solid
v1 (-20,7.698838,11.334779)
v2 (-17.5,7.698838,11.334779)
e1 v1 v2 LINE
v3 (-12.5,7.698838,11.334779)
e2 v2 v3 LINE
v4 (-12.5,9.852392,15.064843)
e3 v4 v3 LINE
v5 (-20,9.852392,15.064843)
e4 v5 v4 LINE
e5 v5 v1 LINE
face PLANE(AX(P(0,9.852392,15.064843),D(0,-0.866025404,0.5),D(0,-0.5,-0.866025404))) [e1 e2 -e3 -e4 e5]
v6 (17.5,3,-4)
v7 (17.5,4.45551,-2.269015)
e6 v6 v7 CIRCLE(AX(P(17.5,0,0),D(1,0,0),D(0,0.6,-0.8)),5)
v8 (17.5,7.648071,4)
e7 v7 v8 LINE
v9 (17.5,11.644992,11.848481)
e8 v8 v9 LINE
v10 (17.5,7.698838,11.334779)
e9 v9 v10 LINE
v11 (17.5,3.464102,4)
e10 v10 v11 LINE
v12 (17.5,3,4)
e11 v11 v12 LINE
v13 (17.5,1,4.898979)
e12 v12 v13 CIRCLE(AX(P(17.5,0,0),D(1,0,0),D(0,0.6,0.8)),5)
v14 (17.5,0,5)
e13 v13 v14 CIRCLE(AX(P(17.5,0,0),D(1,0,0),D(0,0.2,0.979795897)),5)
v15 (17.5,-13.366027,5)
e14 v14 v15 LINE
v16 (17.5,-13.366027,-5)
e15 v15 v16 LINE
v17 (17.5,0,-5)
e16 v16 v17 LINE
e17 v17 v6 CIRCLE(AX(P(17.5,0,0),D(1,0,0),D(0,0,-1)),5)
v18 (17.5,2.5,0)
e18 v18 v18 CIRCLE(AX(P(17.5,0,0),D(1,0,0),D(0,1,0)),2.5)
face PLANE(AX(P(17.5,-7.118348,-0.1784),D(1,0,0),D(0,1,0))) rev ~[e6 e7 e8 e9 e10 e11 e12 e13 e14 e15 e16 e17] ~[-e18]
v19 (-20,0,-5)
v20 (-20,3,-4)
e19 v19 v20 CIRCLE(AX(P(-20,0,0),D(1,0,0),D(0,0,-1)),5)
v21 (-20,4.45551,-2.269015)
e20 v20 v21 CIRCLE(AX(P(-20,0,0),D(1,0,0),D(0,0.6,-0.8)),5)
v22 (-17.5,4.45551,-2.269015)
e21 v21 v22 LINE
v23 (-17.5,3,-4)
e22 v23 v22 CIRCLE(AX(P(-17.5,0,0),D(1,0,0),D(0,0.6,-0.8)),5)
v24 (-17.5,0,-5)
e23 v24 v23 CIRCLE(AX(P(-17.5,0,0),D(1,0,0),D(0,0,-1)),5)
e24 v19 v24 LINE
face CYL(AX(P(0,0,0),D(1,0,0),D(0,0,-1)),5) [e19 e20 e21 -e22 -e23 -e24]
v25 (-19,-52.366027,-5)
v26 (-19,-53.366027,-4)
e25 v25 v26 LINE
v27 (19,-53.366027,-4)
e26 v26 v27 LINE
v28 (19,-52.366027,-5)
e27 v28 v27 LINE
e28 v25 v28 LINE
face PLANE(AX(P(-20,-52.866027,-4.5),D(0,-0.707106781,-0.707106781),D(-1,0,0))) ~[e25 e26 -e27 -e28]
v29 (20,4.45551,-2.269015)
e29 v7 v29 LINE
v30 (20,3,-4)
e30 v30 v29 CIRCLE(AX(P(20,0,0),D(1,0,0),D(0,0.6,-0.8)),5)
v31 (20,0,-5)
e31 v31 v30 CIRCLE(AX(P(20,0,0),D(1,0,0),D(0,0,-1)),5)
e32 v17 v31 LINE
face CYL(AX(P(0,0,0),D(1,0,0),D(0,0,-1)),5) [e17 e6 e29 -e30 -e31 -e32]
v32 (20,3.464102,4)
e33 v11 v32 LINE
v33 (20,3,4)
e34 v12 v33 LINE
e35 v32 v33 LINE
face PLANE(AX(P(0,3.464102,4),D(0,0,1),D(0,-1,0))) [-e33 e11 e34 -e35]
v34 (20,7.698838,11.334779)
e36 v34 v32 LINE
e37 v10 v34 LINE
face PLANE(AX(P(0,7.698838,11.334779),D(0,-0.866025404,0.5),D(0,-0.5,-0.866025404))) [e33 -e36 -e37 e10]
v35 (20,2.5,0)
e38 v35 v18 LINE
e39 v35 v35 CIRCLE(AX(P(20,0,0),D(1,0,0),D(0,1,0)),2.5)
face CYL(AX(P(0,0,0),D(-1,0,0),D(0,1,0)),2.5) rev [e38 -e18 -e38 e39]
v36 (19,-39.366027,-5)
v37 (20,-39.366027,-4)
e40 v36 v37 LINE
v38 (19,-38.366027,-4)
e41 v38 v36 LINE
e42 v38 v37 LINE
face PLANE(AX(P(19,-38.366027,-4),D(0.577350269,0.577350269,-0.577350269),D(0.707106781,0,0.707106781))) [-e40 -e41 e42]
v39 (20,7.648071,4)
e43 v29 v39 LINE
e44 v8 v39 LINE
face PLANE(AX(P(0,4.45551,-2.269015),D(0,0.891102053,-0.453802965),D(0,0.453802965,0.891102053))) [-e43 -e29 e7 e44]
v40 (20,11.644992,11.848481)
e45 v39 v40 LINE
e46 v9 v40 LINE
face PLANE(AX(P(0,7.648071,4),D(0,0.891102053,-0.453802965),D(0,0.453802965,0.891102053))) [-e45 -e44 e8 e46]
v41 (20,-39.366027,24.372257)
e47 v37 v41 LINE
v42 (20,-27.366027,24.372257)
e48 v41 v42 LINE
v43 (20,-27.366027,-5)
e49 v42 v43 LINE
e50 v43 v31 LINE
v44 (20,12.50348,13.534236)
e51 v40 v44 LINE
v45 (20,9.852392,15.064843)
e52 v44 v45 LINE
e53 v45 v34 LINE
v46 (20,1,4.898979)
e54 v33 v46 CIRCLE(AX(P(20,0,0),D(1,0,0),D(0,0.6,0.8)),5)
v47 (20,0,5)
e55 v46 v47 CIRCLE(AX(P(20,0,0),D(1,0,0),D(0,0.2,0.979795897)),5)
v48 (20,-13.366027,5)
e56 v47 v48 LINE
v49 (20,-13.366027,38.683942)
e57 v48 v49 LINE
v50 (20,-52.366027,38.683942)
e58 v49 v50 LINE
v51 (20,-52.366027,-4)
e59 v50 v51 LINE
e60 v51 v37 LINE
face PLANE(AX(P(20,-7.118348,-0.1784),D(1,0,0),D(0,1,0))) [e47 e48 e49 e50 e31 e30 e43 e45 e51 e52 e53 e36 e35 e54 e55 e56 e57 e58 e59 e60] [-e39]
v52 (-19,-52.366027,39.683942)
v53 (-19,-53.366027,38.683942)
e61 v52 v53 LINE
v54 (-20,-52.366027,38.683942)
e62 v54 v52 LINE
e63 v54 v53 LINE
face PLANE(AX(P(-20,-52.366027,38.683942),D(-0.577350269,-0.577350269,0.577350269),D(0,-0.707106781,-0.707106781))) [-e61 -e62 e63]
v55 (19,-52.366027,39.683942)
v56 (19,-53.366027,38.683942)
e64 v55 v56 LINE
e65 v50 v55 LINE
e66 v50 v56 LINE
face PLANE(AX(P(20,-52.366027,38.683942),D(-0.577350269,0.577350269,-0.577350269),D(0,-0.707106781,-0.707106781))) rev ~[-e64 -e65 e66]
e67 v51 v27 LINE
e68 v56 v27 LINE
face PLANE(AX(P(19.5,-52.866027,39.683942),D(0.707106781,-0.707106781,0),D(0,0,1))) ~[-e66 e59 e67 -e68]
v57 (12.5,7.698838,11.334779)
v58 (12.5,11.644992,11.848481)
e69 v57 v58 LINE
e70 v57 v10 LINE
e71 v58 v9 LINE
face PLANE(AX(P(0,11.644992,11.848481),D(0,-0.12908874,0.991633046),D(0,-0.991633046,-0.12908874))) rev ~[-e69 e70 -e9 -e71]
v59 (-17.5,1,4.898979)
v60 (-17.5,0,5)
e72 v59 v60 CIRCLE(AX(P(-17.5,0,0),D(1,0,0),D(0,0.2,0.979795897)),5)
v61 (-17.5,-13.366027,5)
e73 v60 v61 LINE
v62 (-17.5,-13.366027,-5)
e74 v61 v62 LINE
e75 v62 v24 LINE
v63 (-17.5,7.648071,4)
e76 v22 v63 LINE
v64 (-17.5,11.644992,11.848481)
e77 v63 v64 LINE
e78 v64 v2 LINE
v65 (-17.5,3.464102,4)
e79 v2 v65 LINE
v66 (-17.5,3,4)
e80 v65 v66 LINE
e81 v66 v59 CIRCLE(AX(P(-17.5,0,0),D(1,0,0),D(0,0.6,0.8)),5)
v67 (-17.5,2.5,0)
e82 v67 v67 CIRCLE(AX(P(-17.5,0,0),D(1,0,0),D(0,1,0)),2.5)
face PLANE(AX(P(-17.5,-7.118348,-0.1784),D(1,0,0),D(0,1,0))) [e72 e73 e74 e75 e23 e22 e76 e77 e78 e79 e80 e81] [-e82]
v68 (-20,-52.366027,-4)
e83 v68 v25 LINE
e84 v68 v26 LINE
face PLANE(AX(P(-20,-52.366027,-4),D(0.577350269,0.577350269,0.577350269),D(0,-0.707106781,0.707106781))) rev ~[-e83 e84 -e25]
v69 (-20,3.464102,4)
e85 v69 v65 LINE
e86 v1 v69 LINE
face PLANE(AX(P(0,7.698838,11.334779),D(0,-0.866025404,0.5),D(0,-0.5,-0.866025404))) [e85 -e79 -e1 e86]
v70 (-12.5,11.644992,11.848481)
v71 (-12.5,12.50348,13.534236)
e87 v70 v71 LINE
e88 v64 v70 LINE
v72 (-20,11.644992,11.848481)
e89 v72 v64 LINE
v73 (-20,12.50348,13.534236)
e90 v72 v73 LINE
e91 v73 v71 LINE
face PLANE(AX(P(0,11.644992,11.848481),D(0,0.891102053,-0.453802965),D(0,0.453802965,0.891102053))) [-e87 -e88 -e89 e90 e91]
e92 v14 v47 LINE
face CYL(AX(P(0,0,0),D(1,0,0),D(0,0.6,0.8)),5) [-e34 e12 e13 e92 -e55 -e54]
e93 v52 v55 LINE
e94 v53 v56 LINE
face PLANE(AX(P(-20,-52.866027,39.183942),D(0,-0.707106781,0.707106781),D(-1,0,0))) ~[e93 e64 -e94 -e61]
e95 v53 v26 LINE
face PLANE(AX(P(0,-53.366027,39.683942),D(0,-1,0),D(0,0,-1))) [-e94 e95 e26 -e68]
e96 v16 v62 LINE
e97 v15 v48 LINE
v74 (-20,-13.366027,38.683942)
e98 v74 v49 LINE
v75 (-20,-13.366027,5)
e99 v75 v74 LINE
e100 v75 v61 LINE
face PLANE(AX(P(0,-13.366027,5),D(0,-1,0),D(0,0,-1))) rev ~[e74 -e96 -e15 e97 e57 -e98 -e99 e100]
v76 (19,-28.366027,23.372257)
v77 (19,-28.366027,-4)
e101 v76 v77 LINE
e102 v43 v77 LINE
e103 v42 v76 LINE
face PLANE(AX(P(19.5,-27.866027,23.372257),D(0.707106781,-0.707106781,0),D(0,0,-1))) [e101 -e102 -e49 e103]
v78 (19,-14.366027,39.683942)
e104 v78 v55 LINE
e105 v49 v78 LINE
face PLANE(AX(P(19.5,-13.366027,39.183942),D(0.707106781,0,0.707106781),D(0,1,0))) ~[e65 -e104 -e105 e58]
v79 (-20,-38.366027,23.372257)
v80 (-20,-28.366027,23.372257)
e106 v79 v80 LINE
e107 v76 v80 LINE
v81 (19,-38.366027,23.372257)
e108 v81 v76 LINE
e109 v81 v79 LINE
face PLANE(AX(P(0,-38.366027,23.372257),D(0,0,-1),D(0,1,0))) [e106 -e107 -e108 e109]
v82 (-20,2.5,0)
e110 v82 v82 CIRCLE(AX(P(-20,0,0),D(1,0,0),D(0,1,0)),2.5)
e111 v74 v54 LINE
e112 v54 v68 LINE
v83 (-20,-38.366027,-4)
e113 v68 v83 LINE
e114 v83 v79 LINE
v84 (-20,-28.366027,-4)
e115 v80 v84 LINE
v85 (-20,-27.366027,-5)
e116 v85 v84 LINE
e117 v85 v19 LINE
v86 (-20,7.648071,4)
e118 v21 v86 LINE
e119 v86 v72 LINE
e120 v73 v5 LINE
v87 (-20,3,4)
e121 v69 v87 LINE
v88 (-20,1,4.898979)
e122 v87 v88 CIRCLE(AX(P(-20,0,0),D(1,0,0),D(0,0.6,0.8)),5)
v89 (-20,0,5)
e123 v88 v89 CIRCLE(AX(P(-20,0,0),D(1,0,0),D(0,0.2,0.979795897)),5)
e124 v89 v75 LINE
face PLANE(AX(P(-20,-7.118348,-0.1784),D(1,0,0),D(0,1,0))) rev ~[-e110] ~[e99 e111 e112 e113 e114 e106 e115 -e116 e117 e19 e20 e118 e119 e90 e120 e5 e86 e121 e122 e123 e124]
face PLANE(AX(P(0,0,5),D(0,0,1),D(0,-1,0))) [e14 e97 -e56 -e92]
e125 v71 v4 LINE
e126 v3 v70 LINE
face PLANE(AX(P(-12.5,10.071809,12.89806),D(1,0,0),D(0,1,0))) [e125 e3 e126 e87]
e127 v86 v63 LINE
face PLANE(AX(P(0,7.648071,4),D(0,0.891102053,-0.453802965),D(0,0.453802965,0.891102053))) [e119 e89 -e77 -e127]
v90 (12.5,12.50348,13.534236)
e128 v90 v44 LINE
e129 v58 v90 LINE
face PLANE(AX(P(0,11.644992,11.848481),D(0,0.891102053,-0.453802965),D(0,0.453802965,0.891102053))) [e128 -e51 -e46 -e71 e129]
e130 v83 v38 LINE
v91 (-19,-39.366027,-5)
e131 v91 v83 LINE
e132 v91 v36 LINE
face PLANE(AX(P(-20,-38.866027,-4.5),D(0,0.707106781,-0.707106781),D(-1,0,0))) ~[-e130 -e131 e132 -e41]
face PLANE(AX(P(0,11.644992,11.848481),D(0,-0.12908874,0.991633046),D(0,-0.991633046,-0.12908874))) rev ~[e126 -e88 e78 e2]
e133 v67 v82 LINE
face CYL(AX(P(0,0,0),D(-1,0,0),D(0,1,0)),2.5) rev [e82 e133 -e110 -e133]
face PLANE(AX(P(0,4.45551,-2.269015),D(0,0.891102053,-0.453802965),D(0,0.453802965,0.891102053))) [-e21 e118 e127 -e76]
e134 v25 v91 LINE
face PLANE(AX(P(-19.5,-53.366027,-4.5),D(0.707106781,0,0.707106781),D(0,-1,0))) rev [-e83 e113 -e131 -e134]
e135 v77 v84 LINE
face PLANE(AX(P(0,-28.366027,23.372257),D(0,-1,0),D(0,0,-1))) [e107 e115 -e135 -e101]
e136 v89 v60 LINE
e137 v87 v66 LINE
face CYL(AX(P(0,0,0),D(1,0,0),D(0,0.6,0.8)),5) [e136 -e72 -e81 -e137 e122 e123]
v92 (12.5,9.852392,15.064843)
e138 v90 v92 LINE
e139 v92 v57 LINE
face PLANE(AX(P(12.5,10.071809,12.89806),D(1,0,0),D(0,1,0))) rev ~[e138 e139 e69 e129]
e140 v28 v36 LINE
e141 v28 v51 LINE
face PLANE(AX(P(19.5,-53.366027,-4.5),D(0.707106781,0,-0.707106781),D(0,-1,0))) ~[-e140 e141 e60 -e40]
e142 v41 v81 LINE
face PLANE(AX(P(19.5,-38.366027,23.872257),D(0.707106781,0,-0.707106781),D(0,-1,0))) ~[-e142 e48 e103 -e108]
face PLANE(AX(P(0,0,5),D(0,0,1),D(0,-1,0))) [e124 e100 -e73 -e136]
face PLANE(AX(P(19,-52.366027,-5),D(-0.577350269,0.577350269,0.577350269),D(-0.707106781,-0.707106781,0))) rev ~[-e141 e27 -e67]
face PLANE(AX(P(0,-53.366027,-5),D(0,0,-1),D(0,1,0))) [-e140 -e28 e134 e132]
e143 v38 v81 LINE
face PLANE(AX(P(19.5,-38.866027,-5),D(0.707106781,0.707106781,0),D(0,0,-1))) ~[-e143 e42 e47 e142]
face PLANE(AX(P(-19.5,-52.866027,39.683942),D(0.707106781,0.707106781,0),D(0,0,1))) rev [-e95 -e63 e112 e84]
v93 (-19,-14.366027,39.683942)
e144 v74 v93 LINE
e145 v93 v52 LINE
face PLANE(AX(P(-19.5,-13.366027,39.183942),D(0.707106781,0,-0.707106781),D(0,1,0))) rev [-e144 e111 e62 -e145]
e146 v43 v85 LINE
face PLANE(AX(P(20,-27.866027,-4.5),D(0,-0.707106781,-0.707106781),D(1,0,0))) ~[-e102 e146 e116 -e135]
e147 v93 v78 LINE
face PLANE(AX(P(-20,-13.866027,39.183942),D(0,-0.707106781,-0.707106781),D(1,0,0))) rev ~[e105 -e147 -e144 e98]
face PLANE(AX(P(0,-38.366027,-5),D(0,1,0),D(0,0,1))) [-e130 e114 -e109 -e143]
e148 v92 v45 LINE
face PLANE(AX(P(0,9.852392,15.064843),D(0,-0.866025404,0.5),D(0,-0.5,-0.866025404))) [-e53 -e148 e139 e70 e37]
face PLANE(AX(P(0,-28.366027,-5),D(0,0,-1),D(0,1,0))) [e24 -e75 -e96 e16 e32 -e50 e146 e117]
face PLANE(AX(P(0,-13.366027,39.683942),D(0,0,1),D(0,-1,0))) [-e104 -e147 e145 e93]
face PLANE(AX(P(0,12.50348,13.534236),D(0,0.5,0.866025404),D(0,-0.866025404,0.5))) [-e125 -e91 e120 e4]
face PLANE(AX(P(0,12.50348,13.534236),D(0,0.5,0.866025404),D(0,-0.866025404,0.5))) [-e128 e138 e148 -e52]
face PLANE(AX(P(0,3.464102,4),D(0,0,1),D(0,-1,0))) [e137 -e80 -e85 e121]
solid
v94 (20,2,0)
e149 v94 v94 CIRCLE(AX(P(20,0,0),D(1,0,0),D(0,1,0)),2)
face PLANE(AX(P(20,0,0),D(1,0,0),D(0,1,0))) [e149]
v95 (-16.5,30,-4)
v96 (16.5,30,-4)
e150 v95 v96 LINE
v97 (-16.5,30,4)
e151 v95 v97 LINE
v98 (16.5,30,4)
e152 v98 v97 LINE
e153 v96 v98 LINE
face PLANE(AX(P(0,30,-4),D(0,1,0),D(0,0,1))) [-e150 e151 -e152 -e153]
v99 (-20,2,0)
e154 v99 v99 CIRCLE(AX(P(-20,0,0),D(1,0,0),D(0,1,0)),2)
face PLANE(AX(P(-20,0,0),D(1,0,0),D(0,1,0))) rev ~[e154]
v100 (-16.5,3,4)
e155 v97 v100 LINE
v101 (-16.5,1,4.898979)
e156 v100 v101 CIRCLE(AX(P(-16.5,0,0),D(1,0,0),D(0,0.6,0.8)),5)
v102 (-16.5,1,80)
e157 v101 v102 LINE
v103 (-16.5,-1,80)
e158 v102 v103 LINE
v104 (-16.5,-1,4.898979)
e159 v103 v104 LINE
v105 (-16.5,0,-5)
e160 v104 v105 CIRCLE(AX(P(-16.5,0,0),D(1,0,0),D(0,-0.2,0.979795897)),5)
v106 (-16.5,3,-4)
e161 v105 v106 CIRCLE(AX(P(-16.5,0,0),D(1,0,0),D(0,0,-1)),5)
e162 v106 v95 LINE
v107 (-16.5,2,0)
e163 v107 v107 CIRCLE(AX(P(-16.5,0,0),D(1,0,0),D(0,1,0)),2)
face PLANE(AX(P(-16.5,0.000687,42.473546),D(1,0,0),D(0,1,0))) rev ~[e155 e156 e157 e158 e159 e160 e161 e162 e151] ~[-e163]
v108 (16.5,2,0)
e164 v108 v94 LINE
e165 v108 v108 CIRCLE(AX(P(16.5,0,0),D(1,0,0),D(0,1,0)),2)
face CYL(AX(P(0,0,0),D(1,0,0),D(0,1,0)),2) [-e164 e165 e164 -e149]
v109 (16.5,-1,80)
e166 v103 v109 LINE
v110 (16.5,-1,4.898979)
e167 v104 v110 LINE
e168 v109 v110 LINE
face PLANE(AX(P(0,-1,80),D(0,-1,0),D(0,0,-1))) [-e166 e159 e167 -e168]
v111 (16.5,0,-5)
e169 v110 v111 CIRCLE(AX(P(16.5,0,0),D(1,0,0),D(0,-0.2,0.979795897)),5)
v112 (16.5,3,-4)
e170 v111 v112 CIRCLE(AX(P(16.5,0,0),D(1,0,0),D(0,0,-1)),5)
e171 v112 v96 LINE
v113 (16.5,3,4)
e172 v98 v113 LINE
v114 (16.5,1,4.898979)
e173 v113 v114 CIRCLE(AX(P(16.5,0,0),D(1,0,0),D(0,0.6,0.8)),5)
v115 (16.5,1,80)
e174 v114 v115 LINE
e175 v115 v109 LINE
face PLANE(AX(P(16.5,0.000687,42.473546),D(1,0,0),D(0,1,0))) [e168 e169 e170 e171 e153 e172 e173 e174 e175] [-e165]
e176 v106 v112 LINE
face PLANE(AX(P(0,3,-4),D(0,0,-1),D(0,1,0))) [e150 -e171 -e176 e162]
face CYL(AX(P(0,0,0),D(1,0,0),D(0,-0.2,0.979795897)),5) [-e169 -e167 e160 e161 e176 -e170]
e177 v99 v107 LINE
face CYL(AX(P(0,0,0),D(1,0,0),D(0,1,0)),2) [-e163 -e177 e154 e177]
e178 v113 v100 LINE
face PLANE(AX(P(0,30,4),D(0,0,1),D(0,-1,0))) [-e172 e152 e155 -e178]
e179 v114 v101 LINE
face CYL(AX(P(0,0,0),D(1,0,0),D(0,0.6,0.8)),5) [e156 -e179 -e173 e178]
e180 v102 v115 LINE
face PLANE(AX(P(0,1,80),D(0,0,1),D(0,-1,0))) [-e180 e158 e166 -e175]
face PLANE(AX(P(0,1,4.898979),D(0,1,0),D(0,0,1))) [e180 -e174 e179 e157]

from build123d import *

# Parameters (mm, degrees)
F0_R     = 2.5
F1_DEPTH = 20
F2_DEPTH = 17.5
F0_R_2   = 2
F3_DEPTH = 16.5
F4_DEPTH = 20
F5_DEPTH = 12.5
F6_SIZE  = 1


# Not quite as in the source:
# - a feature names something its author has since deleted; it is built from what else it names


with BuildPart() as f1:
    # F0 (on Right) → F1 (new body, symmetric)
    with BuildSketch(Plane.YZ):
        with BuildLine():
            Line((-13.3660271764, -5), (0, -5))
            ThreePointArc((0, -5), (-4.974680765, -0.50254481), (-1, 4.8989794856))
            Line((-1, 4.8989794856), (-1, 5))
            Line((-1, 5), (-13.3660271764, 5))
            Line((-13.3660271764, 5), (-13.3660271764, -5))
        make_face()
        Polygon((-28.3660271764, -5), (-13.3660271764, -5), (-13.3660271764, 5), (-13.3660271764, 39.6839417517), (-53.3660271764, 39.6839417517), (-53.3660271764, 5), (-53.3660271764, -5), (-38.3660271764, -5), (-38.3660271764, 23.3722571284), (-28.3660271764, 23.3722571284), align=None)
        with BuildLine():
            ThreePointArc((-1, 4.8989794856), (-4.974680765, -0.50254481), (0, -5))
            ThreePointArc((0, -5), (1.5811388301, -4.7434164903), (3, -4))
            Line((3, -4), (3, 4))
            ThreePointArc((3, 4), (2.0498880528, 4.5604779323), (1, 4.8989794856))
            Line((1, 4.8989794856), (-1, 4.8989794856))
        make_face()
        Circle(F0_R, mode=Mode.SUBTRACT)
        with BuildLine():
            ThreePointArc((0, 5), (-0.50254481, 4.974680765), (-1, 4.8989794856))
            Line((-1, 4.8989794856), (1, 4.8989794856))
            ThreePointArc((1, 4.8989794856), (0.50254481, 4.974680765), (0, 5))
        make_face()
        with BuildLine():
            Line((-1, 5), (-1, 4.8989794856))
            ThreePointArc((-1, 4.8989794856), (-0.50254481, 4.974680765), (0, 5))
            Line((0, 5), (-1, 5))
        make_face()
        with BuildLine():
            Line((3, 4), (3, -4))
            ThreePointArc((3, -4), (3.8269094248, -3.2178819516), (4.4555102649, -2.2690148257))
            ThreePointArc((4.4555102649, -2.2690148257), (4.8619724045, -1.1667151914), (5, 0))
            ThreePointArc((5, 0), (4.5594723232, 2.0521238105), (3.3155151466, 3.7426406871))
            ThreePointArc((3.3155151466, 3.7426406871), (3.1603783548, 3.8745333467), (3, 4))
        make_face()
        Polygon((-28.3660271764, -5), (-13.3660271764, -5), (-13.3660271764, 5), (-13.3660271764, 39.6839417517), (-53.3660271764, 39.6839417517), (-53.3660271764, 5), (-53.3660271764, -5), (-38.3660271764, -5), (-38.3660271764, 23.3722571284), (-28.3660271764, 23.3722571284), align=None)
        with BuildLine():
            Line((3.4641016151, 4), (3, 4))
            ThreePointArc((3, 4), (3.1603783548, 3.8745333467), (3.3155151466, 3.7426406871))
            Line((3.3155151466, 3.7426406871), (3.4641016151, 4))
        make_face()
        with BuildLine():
            ThreePointArc((5, 0), (4.8619724045, -1.1667151914), (4.4555102649, -2.2690148257))
            Line((4.4555102649, -2.2690148257), (7.6480711023, 4))
            Line((7.6480711023, 4), (3.4641016151, 4))
            Line((3.4641016151, 4), (3.3155151466, 3.7426406871))
            ThreePointArc((3.3155151466, 3.7426406871), (4.5594723232, 2.0521238105), (5, 0))
        make_face()
        Polygon((7.6988384706, 11.3347793903), (11.6449917103, 11.8484814621), (12.5034797738, 13.5342361498), (9.8523915105, 15.0648426723), align=None)
        Polygon((3.4641016151, 4), (7.6480711023, 4), (11.6449917103, 11.8484814621), (7.6988384706, 11.3347793903), align=None)
    extrude(amount=F1_DEPTH, both=True)

    # F0 (on Right) → F2 (cut, symmetric)
    with BuildSketch(Plane.YZ):
        with BuildLine():
            Line((-13.3660271764, -5), (0, -5))
            ThreePointArc((0, -5), (-4.974680765, -0.50254481), (-1, 4.8989794856))
            Line((-1, 4.8989794856), (-1, 5))
            Line((-1, 5), (-13.3660271764, 5))
            Line((-13.3660271764, 5), (-13.3660271764, -5))
        make_face()
        with BuildLine():
            ThreePointArc((-1, 4.8989794856), (-4.974680765, -0.50254481), (0, -5))
            ThreePointArc((0, -5), (1.5811388301, -4.7434164903), (3, -4))
            Line((3, -4), (3, 4))
            ThreePointArc((3, 4), (2.0498880528, 4.5604779323), (1, 4.8989794856))
            Line((1, 4.8989794856), (-1, 4.8989794856))
        make_face()
        Circle(F0_R, mode=Mode.SUBTRACT)
        with BuildLine():
            Line((-1, 5), (-1, 4.8989794856))
            ThreePointArc((-1, 4.8989794856), (-0.50254481, 4.974680765), (0, 5))
            Line((0, 5), (-1, 5))
        make_face()
        with BuildLine():
            ThreePointArc((0, 5), (-0.50254481, 4.974680765), (-1, 4.8989794856))
            Line((-1, 4.8989794856), (1, 4.8989794856))
            ThreePointArc((1, 4.8989794856), (0.50254481, 4.974680765), (0, 5))
        make_face()
        with BuildLine():
            Line((3, 4), (3, -4))
            ThreePointArc((3, -4), (3.8269094248, -3.2178819516), (4.4555102649, -2.2690148257))
            ThreePointArc((4.4555102649, -2.2690148257), (4.8619724045, -1.1667151914), (5, 0))
            ThreePointArc((5, 0), (4.5594723232, 2.0521238105), (3.3155151466, 3.7426406871))
            ThreePointArc((3.3155151466, 3.7426406871), (3.1603783548, 3.8745333467), (3, 4))
        make_face()
        Polygon((3.4641016151, 4), (7.6480711023, 4), (11.6449917103, 11.8484814621), (7.6988384706, 11.3347793903), align=None)
        with BuildLine():
            ThreePointArc((5, 0), (4.8619724045, -1.1667151914), (4.4555102649, -2.2690148257))
            Line((4.4555102649, -2.2690148257), (7.6480711023, 4))
            Line((7.6480711023, 4), (3.4641016151, 4))
            Line((3.4641016151, 4), (3.3155151466, 3.7426406871))
            ThreePointArc((3.3155151466, 3.7426406871), (4.5594723232, 2.0521238105), (5, 0))
        make_face()
        with BuildLine():
            Line((3.4641016151, 4), (3, 4))
            ThreePointArc((3, 4), (3.1603783548, 3.8745333467), (3.3155151466, 3.7426406871))
            Line((3.3155151466, 3.7426406871), (3.4641016151, 4))
        make_face()
    extrude(amount=F2_DEPTH, both=True, mode=Mode.SUBTRACT)

    # F0 (on Right) → F5 (cut, symmetric)
    with BuildSketch(Plane.YZ):
        Polygon((7.6988384706, 11.3347793903), (11.6449917103, 11.8484814621), (12.5034797738, 13.5342361498), (9.8523915105, 15.0648426723), align=None)
    extrude(amount=F5_DEPTH, both=True, mode=Mode.SUBTRACT)

    # F6
    f6_edges = [f1.edges().sort_by_distance(p)[0] for p in [
        (0, -53.366027, 39.683942),
        (20, -33.366027, 39.683942),
        (0, -13.366027, 39.683942),
        (-20, -33.366027, 39.683942),
        (20, -53.366027, 17.341971),
        (20, -45.866027, -5),
        (0, -38.366027, -5),
        (0, -28.366027, -5),
        (20, -38.366027, 9.186129),
        (20, -33.366027, 23.372257),
        (20, -28.366027, 9.186129),
        (0, -53.366027, -5),
        (-20, -45.866027, -5),
        (-20, -53.366027, 17.341971),
    ]]
    chamfer(f6_edges, length=F6_SIZE)


with BuildPart() as f3:
    # F0 (on Right) → F3 (new body, symmetric)
    with BuildSketch(Plane.YZ):
        with BuildLine():
            Line((-1, 5), (0, 5))
            ThreePointArc((0, 5), (0.50254481, 4.974680765), (1, 4.8989794856))
            Line((1, 4.8989794856), (1, 80))
            Line((1, 80), (-1, 80))
            Line((-1, 80), (-1, 5))
        make_face()
        with BuildLine():
            Line((-1, 5), (-1, 4.8989794856))
            ThreePointArc((-1, 4.8989794856), (-0.50254481, 4.974680765), (0, 5))
            Line((0, 5), (-1, 5))
        make_face()
        with BuildLine():
            ThreePointArc((0, 5), (-0.50254481, 4.974680765), (-1, 4.8989794856))
            Line((-1, 4.8989794856), (1, 4.8989794856))
            ThreePointArc((1, 4.8989794856), (0.50254481, 4.974680765), (0, 5))
        make_face()
        with BuildLine():
            ThreePointArc((-1, 4.8989794856), (-4.974680765, -0.50254481), (0, -5))
            ThreePointArc((0, -5), (1.5811388301, -4.7434164903), (3, -4))
            Line((3, -4), (3, 4))
            ThreePointArc((3, 4), (2.0498880528, 4.5604779323), (1, 4.8989794856))
            Line((1, 4.8989794856), (-1, 4.8989794856))
        make_face()
        Circle(F0_R, mode=Mode.SUBTRACT)
        with BuildLine():
            Line((3, 4), (3, -4))
            ThreePointArc((3, -4), (3.8269094248, -3.2178819516), (4.4555102649, -2.2690148257))
            ThreePointArc((4.4555102649, -2.2690148257), (4.8619724045, -1.1667151914), (5, 0))
            ThreePointArc((5, 0), (4.5594723232, 2.0521238105), (3.3155151466, 3.7426406871))
            ThreePointArc((3.3155151466, 3.7426406871), (3.1603783548, 3.8745333467), (3, 4))
        make_face()
        Circle(F0_R)
        Circle(F0_R_2, mode=Mode.SUBTRACT)
        Circle(F0_R_2)
        with BuildLine():
            ThreePointArc((4.4555102649, -2.2690148257), (3.8269094248, -3.2178819516), (3, -4))
            Line((3, -4), (30, -4))
            Line((30, -4), (30, 4))
            Line((30, 4), (7.6480711023, 4))
            Line((7.6480711023, 4), (4.4555102649, -2.2690148257))
        make_face()
        with BuildLine():
            ThreePointArc((5, 0), (4.8619724045, -1.1667151914), (4.4555102649, -2.2690148257))
            Line((4.4555102649, -2.2690148257), (7.6480711023, 4))
            Line((7.6480711023, 4), (3.4641016151, 4))
            Line((3.4641016151, 4), (3.3155151466, 3.7426406871))
            ThreePointArc((3.3155151466, 3.7426406871), (4.5594723232, 2.0521238105), (5, 0))
        make_face()
        with BuildLine():
            Line((3.4641016151, 4), (3, 4))
            ThreePointArc((3, 4), (3.1603783548, 3.8745333467), (3.3155151466, 3.7426406871))
            Line((3.3155151466, 3.7426406871), (3.4641016151, 4))
        make_face()
    extrude(amount=F3_DEPTH, both=True)

    # F0 (on Right) → F4 (join, symmetric)
    with BuildSketch(Plane.YZ):
        Circle(F0_R_2)
    extrude(amount=F4_DEPTH, both=True)


solid = Compound([f1.part, f3.part])
